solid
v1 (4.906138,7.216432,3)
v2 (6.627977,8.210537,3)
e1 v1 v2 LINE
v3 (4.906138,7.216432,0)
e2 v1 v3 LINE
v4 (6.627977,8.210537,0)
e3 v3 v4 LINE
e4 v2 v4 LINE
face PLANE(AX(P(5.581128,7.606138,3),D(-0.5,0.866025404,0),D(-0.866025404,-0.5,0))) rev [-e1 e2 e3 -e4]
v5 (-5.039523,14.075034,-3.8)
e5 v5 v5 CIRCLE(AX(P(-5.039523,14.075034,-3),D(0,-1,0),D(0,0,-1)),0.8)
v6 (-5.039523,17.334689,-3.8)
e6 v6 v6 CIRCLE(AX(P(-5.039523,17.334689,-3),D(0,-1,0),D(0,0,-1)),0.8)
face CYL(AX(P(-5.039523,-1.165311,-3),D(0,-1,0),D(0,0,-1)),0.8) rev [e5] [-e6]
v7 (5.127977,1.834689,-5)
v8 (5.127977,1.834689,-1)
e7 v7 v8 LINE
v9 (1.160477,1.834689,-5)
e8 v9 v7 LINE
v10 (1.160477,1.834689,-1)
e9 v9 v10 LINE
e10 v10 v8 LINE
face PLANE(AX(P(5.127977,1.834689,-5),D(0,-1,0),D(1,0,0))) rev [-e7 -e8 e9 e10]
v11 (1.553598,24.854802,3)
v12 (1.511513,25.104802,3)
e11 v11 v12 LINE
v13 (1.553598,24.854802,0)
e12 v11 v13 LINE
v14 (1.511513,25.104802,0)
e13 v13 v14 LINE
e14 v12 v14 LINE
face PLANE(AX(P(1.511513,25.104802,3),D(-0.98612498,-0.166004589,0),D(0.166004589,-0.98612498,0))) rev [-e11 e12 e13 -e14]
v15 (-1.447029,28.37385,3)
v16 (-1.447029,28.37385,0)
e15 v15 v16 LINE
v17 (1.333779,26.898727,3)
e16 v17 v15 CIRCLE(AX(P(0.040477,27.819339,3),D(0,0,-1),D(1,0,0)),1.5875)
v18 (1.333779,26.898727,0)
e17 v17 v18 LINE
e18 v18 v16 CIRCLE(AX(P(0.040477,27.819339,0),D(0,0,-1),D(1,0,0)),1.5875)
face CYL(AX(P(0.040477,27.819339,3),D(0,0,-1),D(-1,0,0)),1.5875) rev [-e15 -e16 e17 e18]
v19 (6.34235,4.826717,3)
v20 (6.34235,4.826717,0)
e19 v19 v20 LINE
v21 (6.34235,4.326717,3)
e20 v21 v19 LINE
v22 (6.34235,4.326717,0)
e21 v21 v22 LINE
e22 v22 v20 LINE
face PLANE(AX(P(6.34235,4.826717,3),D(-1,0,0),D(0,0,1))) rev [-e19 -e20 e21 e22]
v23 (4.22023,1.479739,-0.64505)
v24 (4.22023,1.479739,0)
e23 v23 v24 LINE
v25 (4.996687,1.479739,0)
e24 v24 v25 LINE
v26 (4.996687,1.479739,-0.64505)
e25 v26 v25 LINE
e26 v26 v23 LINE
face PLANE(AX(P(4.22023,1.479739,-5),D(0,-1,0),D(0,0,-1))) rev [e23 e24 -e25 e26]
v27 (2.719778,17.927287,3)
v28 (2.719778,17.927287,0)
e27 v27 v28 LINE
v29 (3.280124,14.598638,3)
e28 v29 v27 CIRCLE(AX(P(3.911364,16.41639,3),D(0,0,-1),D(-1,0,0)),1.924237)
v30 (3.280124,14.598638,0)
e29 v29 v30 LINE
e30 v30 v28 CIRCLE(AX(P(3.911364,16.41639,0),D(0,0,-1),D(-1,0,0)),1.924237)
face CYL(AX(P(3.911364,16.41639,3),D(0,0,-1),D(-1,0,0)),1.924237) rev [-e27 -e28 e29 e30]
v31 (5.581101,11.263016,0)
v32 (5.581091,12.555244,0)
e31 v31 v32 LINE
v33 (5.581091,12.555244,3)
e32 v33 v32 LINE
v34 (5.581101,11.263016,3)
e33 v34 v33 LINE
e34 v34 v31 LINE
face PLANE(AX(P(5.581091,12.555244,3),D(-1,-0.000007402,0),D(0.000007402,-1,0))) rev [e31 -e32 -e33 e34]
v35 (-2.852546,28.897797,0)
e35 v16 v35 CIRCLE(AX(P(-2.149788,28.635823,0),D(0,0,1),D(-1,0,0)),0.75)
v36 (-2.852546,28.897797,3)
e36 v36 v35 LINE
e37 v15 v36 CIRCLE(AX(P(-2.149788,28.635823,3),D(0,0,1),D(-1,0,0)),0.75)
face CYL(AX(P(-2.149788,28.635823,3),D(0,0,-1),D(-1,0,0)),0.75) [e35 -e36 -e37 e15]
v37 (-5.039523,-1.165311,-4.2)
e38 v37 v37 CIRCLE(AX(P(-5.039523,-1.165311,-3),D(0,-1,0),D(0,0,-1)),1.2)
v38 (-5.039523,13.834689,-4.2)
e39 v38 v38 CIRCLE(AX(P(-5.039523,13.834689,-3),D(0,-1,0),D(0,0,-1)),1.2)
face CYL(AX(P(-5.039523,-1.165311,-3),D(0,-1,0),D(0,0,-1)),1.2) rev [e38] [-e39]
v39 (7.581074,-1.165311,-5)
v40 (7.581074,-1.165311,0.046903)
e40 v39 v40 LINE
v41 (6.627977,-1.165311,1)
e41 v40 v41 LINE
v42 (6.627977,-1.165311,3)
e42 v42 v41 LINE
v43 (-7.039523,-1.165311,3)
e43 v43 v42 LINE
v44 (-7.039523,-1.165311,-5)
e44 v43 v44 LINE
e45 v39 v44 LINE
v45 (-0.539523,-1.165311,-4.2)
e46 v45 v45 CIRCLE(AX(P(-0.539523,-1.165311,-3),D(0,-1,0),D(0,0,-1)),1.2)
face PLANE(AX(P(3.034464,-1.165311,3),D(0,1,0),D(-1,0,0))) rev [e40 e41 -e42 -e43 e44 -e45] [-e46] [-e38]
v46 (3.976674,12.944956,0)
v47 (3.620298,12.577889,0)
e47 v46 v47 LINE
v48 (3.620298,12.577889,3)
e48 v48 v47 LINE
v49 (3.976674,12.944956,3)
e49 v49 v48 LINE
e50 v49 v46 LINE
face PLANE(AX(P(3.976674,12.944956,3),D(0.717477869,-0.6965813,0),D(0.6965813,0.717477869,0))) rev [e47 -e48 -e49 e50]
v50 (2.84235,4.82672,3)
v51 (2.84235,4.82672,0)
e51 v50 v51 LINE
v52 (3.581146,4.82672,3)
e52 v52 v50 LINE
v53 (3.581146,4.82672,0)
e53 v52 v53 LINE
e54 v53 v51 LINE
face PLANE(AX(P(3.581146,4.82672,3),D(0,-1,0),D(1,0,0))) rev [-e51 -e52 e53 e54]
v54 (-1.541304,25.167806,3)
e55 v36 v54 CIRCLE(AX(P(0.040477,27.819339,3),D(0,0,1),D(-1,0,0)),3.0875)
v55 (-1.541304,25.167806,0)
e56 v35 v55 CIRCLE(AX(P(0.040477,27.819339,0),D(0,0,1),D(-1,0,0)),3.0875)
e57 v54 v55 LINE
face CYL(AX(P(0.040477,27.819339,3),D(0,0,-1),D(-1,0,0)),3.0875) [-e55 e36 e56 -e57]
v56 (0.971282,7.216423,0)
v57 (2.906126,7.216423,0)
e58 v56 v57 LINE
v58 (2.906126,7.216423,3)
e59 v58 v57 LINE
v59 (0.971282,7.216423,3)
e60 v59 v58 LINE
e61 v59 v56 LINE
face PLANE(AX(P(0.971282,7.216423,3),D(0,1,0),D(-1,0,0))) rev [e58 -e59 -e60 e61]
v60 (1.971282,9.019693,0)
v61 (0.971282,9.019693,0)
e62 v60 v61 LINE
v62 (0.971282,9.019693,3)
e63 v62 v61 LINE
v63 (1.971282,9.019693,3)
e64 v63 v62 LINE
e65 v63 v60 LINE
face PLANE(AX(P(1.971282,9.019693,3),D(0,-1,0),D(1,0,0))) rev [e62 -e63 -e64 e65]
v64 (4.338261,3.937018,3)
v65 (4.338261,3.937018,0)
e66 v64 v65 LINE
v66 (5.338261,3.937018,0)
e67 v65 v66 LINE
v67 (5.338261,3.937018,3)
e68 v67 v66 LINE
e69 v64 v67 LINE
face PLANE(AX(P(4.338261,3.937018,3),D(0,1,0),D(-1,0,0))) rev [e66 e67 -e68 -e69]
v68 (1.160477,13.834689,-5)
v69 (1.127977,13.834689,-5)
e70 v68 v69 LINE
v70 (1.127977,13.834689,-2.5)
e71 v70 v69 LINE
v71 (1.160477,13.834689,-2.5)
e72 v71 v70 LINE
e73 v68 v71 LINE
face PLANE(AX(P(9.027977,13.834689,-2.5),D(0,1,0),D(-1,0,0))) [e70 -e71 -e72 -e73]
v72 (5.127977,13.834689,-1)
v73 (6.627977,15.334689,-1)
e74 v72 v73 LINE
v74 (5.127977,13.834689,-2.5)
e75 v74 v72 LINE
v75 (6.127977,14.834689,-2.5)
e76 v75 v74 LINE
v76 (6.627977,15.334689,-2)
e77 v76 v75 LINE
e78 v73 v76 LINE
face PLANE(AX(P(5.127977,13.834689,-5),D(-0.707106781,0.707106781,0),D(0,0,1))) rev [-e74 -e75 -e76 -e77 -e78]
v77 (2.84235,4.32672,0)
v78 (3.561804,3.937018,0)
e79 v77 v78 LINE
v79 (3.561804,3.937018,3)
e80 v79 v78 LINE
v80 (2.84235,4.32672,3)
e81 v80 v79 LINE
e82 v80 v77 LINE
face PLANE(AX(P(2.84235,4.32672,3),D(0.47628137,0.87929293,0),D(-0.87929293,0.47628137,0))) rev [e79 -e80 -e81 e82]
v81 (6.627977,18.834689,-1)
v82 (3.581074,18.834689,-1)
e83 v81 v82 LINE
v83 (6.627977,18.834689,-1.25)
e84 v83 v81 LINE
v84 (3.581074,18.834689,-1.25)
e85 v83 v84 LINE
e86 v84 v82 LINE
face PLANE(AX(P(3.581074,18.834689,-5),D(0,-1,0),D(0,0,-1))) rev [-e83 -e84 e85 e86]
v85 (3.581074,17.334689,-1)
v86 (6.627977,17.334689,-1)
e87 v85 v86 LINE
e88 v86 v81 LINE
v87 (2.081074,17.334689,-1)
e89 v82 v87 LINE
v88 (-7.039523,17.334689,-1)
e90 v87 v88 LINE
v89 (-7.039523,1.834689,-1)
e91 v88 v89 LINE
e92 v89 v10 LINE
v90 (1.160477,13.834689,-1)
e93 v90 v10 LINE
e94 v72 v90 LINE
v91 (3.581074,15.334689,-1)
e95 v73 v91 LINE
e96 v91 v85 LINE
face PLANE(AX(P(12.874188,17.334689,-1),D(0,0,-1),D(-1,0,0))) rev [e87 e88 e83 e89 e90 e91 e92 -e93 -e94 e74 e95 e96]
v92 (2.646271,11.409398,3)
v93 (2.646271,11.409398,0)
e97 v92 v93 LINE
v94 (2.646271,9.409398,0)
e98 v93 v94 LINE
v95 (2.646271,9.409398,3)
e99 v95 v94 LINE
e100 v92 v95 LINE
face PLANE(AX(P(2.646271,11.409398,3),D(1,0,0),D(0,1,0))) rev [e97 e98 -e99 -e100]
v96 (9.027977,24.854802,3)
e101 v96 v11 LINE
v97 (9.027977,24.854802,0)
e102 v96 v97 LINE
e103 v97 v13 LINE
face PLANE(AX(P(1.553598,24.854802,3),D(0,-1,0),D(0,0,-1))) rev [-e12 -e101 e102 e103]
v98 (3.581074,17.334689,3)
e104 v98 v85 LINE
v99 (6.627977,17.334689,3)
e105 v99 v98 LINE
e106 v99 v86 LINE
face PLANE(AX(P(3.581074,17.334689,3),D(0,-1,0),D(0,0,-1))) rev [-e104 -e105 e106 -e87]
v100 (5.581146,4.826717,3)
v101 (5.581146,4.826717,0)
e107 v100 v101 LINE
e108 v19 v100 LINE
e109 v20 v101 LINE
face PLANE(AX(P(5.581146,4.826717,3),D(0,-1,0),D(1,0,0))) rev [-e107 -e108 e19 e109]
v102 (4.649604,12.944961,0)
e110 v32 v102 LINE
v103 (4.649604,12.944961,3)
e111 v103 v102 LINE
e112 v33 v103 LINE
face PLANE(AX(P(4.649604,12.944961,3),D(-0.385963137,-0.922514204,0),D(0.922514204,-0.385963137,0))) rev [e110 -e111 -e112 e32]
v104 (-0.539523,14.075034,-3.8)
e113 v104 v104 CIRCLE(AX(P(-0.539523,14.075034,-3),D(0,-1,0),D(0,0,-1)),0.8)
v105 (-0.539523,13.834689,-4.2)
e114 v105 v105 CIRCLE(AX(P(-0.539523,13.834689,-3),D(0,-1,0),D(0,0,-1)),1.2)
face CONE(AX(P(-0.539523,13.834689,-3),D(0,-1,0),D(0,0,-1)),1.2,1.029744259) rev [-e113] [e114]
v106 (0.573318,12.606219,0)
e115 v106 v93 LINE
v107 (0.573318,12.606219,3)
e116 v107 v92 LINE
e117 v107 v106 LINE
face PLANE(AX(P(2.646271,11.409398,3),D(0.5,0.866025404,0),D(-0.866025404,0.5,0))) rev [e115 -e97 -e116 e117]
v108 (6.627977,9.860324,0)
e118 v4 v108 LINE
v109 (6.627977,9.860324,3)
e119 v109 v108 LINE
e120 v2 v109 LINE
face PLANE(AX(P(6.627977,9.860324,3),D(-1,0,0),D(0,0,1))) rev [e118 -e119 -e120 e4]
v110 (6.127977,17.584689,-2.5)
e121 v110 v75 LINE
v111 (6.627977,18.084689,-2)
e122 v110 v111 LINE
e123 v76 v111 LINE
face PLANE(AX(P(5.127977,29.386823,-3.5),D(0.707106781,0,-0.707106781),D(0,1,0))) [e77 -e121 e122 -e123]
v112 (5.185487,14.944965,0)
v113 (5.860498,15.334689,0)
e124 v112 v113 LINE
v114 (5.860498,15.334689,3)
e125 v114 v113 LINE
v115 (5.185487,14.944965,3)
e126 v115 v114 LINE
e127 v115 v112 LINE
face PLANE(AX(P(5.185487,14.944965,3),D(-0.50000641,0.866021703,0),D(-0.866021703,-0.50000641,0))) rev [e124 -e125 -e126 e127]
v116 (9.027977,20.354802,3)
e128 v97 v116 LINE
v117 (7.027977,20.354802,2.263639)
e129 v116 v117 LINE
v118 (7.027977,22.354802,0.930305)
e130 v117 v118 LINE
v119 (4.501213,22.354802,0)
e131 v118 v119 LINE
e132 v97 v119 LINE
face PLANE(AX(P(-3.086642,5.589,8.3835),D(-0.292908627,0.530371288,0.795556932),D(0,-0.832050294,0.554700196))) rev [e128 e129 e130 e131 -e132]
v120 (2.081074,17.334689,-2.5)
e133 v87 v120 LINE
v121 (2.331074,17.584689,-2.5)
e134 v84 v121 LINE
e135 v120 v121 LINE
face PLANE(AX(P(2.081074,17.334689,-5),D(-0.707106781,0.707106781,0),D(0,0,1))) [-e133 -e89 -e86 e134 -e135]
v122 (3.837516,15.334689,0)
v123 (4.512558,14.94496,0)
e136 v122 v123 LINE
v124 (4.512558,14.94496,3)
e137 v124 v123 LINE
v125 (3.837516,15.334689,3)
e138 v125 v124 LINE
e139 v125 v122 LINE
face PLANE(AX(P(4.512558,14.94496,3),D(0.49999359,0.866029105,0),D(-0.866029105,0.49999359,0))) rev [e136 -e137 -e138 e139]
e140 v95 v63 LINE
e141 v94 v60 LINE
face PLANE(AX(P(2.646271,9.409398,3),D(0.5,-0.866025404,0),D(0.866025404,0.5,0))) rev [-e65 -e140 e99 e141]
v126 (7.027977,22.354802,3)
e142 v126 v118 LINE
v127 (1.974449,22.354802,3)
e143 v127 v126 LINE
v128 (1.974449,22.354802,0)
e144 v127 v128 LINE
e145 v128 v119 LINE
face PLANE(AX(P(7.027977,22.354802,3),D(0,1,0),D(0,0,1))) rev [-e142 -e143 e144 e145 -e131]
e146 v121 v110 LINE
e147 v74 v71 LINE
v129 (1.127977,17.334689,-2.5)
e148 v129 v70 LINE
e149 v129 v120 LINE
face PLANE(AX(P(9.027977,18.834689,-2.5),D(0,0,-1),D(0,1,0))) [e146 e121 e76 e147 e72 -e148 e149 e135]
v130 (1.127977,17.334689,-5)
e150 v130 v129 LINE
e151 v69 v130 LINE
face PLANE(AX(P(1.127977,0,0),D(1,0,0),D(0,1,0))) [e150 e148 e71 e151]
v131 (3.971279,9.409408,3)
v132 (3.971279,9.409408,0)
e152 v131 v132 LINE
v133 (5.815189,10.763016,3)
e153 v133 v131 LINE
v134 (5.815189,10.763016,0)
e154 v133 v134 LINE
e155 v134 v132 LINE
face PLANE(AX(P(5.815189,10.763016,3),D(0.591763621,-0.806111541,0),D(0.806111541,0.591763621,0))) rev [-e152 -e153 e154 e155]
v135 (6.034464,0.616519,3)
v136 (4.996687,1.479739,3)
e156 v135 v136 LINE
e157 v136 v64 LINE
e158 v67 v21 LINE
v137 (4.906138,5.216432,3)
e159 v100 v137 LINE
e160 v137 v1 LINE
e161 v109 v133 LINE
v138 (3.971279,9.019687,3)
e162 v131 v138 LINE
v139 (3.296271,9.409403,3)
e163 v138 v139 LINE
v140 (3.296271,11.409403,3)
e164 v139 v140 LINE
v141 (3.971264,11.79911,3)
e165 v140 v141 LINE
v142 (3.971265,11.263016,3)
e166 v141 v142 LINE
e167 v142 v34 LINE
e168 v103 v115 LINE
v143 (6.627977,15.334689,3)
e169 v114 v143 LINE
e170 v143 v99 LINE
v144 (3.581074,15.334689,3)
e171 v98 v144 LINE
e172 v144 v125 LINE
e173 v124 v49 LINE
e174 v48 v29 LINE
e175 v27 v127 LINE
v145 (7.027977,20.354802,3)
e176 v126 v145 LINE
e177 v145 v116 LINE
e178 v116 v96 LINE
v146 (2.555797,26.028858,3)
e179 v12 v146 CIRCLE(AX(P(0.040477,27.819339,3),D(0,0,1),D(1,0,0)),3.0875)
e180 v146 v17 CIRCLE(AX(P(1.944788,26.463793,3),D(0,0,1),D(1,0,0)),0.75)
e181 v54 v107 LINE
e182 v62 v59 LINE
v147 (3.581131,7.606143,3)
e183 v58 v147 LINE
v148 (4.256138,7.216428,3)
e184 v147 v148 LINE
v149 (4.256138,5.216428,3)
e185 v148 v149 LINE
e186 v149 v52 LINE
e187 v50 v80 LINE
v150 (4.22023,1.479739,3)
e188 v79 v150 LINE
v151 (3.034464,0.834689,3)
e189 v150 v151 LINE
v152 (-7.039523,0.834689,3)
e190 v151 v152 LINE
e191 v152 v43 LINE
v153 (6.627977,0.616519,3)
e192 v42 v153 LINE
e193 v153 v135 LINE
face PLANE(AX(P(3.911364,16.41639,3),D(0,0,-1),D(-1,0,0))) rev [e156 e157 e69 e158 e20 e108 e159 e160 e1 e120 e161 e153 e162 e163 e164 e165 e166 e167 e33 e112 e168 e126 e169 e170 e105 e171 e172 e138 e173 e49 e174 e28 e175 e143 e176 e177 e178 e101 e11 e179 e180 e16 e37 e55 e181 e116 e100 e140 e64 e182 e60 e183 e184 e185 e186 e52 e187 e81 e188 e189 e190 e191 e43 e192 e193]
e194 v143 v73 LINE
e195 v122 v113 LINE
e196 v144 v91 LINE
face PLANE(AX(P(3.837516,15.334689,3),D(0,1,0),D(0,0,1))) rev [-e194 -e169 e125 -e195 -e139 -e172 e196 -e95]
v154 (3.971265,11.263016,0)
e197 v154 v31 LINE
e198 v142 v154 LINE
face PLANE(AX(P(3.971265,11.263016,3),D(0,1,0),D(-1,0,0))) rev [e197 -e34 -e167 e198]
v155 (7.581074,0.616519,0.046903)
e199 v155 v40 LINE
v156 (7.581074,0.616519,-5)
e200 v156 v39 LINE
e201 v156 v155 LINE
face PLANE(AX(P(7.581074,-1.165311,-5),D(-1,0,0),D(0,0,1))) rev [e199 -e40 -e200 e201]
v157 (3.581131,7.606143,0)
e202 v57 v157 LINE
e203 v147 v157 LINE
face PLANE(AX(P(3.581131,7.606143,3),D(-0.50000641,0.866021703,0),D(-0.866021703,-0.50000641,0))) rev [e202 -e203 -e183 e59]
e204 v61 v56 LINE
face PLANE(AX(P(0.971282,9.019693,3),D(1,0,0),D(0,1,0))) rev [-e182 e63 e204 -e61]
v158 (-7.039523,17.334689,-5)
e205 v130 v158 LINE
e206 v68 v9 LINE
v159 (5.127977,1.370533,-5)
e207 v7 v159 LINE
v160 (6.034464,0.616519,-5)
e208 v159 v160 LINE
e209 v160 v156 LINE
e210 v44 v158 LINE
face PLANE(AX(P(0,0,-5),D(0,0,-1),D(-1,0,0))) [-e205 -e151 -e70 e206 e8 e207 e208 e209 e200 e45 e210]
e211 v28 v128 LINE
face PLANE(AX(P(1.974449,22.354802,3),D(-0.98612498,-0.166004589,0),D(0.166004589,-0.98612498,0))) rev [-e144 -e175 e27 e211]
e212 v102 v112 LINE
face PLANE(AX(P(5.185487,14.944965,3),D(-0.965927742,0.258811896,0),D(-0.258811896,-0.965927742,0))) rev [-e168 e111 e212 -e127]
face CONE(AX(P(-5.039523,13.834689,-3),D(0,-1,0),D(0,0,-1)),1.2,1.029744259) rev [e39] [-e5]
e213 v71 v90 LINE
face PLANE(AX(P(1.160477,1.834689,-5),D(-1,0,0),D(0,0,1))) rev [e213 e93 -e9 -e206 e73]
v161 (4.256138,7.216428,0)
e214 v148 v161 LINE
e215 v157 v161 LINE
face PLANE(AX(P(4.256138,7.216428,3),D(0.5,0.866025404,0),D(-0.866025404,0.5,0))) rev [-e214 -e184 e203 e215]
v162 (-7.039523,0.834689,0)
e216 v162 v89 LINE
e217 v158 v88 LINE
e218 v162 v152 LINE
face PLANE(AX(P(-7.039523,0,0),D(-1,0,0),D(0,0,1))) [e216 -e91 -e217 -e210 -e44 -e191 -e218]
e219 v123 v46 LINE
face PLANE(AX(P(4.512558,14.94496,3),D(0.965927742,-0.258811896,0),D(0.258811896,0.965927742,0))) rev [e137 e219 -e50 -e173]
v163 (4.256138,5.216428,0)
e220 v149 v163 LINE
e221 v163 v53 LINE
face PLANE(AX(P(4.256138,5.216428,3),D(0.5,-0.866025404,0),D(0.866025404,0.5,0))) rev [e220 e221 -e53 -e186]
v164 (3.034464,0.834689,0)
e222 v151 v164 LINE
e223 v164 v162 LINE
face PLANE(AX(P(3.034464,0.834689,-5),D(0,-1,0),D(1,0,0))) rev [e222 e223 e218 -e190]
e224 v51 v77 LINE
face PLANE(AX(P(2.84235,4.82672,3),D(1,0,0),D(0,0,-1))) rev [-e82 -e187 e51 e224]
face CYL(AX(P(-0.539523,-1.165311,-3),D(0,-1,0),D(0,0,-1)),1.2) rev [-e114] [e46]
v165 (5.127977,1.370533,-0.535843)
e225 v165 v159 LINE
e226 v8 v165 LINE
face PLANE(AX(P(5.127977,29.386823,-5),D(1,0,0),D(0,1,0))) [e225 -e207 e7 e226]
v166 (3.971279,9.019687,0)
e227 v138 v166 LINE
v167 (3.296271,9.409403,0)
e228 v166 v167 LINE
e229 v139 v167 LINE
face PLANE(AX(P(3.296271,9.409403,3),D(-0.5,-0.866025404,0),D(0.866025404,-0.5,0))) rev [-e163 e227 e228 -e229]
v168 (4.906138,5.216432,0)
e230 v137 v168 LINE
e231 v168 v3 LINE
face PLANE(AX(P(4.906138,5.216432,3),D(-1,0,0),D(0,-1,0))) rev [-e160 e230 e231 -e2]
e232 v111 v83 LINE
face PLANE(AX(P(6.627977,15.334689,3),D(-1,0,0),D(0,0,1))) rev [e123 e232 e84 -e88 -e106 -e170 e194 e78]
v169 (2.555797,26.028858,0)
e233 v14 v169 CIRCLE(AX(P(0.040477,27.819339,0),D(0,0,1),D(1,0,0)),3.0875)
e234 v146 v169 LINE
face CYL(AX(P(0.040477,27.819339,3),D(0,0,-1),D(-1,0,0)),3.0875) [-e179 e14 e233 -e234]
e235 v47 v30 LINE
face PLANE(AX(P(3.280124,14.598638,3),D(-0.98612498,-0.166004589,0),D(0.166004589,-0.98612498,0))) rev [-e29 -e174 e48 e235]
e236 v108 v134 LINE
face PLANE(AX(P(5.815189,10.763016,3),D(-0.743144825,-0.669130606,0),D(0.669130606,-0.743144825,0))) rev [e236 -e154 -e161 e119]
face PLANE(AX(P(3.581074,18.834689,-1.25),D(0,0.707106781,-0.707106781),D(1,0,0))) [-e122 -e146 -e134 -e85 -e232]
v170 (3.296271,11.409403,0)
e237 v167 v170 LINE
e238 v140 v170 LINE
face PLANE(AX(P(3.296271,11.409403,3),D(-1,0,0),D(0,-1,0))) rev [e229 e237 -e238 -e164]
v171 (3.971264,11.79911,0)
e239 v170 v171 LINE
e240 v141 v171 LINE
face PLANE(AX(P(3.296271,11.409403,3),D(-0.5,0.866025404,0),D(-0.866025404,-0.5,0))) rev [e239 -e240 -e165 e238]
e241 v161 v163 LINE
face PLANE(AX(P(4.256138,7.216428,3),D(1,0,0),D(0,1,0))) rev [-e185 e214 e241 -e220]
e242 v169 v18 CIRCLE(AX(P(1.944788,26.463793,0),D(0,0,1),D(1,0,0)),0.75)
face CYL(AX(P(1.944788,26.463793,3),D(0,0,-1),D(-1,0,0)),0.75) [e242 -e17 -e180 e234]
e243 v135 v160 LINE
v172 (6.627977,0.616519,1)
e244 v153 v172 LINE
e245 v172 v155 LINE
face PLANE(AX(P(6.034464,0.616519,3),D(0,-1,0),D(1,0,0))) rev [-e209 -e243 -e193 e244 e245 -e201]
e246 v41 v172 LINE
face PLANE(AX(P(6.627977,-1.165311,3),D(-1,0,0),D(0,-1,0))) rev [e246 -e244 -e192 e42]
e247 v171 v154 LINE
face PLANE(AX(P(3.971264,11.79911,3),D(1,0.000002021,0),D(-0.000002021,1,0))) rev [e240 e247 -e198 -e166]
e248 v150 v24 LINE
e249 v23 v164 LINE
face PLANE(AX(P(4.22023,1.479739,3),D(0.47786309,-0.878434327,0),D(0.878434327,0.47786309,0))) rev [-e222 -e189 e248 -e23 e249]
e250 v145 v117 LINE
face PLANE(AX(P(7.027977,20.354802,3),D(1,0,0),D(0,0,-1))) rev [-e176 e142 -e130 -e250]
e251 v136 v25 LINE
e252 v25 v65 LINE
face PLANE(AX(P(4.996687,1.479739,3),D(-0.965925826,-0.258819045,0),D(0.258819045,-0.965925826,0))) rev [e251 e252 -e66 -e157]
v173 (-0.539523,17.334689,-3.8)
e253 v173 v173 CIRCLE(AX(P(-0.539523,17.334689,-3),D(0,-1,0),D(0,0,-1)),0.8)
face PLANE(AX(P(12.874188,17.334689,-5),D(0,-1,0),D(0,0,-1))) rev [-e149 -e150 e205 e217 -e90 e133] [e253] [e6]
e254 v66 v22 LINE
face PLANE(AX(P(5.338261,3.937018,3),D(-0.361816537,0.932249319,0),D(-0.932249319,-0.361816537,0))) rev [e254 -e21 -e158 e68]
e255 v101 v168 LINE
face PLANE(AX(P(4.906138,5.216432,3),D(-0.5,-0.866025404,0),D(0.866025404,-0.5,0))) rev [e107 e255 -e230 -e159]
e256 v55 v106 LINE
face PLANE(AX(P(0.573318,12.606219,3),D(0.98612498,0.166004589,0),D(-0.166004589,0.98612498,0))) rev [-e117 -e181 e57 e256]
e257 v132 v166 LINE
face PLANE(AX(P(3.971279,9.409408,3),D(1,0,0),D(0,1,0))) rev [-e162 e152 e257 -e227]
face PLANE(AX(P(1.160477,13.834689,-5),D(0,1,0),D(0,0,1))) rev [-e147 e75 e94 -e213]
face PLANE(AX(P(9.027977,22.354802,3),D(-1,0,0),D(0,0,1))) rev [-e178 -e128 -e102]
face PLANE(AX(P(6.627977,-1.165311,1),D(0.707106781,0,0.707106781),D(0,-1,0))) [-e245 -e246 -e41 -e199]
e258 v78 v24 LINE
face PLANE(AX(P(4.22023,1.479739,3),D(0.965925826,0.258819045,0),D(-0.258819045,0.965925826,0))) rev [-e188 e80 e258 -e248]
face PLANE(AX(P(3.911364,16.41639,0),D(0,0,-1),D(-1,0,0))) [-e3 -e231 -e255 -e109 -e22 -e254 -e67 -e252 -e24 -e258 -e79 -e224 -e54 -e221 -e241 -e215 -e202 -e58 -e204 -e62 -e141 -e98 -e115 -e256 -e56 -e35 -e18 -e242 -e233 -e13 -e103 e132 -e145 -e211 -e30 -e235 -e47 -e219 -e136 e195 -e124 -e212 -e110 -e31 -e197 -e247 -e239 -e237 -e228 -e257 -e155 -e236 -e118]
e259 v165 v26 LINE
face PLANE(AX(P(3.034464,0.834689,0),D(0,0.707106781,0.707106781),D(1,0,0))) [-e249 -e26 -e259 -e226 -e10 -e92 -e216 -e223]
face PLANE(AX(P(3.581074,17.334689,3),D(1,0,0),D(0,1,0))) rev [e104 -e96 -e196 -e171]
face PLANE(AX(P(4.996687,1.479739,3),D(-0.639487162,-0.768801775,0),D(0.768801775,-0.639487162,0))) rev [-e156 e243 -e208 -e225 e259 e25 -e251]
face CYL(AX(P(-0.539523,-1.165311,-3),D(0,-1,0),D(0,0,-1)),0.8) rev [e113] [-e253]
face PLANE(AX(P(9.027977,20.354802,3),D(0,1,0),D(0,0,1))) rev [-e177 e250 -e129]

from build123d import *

# Parameters (mm, degrees)
BOSS_SWITCH_BODY_DEPTH                    = 3
SKETCH1_W                                 = 4
SKETCH1_H                                 = 3.5
BOSS_FLANGE_WIDTH_DEPTH                   = 5
BOSS_FLANGE_HEIGHT_REACH                  = 35.863
SKETCH2_W                                 = 4
SKETCH2_H                                 = 2
SKETCH2_W_2                               = 8
CUT_UP_TO_DOWN_DERAILLEUR_CLEARANCE_REACH = 21.462
SKETCH10_W                                = 2.453096586
SKETCH10_H                                = 3
SKETCH17_W                                = 12.1675
SKETCH17_H                                = 4
BOSS_FLANGE_SUPPORT_DEPTH                 = 14.499999955
TAP_DRILL_FOR_M2X0_4_TAP1_D               = 1.6
M2_CLEARANCE_HOLE2_D                      = 2.4
M2_CLEARANCE_HOLE2_DEPTH                  = 15
M2_CLEARANCE_HOLE2_TIP                    = 0.721032743
CHAMFER_FLANGE_SUPPORT_SIZE               = 1.5
CHAMFER_FLANGE_SUPPORT_2_SIZE             = 1.5
CHAMFER_FLANGE_SUPPORT_3_SIZE             = 1
SKETCH23_W                                = 3.9675
SKETCH23_H                                = 11.999999954
CUT_GAP_FOR_PRINTING_DEPTH                = 32.000499688
SKETCH25_W                                = 0.953096586
SKETCH25_H                                = 3.5
CUT_DERAILLEUR_CLEARANCE_DEPTH            = 32.145320369
CHAMFER8_SIZE                             = 1
CUT_UP_TO_DOWN_CANTILEVER_SLOPE_REACH     = 31.869
SKETCH26_W                                = 12.477246204
SKETCH26_H                                = 5.771077126
CUT_WIDE_DERAILLEUR_CLEARANCE_DEPTH       = 33.195879702
CUT_WIDE_DERAILLEUR_CLEARANCE_DEPTH_BACK  = 4
SKETCH27_W                                = 2.5
SKETCH27_H                                = 5.000000046
CHAMFER9_SIZE                             = 1.25
SKETCH28_W                                = 3.046903414
SKETCH28_H                                = 1.5
CUT_EXTRUDE1_DEPTH                        = 1


# Some blends are built 0.0001 mm under size
with BuildPart() as part:
    # Sketch-SwitchBossUp → Boss-Switch Body (new body)
    with BuildSketch(Plane.XY):
        with BuildLine():
            Line((5.581091201, 12.55524379), (5.581100766, 11.263016279))
            Line((5.581100766, 11.263016279), (3.971265023, 11.263016279))
            Line((3.971265023, 11.263016279), (3.97126394, 11.79911022))
            Line((3.97126394, 11.79911022), (3.296271341, 11.409403061))
            Line((3.296271341, 11.409403061), (3.296271341, 9.409403061))
            Line((3.296271341, 9.409403061), (3.971278743, 9.019687356))
            Line((3.971278743, 9.019687356), (3.971278743, 9.409408058))
            Line((3.971278743, 9.409408058), (5.815189336, 10.763016279))
            Line((5.815189336, 10.763016279), (6.627976927, 9.860324207))
            Line((6.627976927, 9.860324207), (6.627976927, 8.210536506))
            Line((6.627976927, 8.210536506), (5.581127833, 7.606137899))
            Line((5.581127833, 7.606137899), (4.906138119, 7.216432406))
            Line((4.906138119, 7.216432406), (4.906138119, 5.216432406))
            Line((4.906138119, 5.216432406), (5.58114552, 4.826716701))
            Line((5.58114552, 4.826716701), (6.342350466, 4.826716701))
            Line((6.342350466, 4.826716701), (6.342350466, 4.326716701))
            Line((6.342350466, 4.326716701), (5.338261222, 3.937018274))
            Line((5.338261222, 3.937018274), (4.338261222, 3.937018274))
            Line((4.338261222, 3.937018274), (4.996687221, 1.479738993))
            Line((4.996687221, 1.479738993), (6.034464198, 0.616519013))
            Line((6.034464198, 0.616519013), (6.627976927, 0.616519013))
            Line((6.627976927, 0.616519013), (6.627976927, -1.165310653))
            Line((6.627976927, -1.165310653), (3.034464198, -1.165310653))
            Line((3.034464198, -1.165310653), (3.034464198, 0.834689347))
            Line((3.034464198, 0.834689347), (4.220230086, 1.479738993))
            Line((4.220230086, 1.479738993), (3.561804087, 3.937018274))
            Line((3.561804087, 3.937018274), (2.842350466, 4.326720436))
            Line((2.842350466, 4.326720436), (2.842350466, 4.826720436))
            Line((2.842350466, 4.826720436), (3.58114552, 4.826720436))
            Line((3.58114552, 4.826720436), (4.256138119, 5.216427595))
            Line((4.256138119, 5.216427595), (4.256138119, 7.216427595))
            Line((4.256138119, 7.216427595), (3.581130717, 7.6061433))
            Line((3.581130717, 7.6061433), (2.9061262, 7.216422599))
            Line((2.9061262, 7.216422599), (0.971281627, 7.216422599))
            Line((0.971281627, 7.216422599), (0.971281627, 9.019692757))
            Line((0.971281627, 9.019692757), (1.971281627, 9.019692757))
            Line((1.971281627, 9.019692757), (2.646271341, 9.40939825))
            Line((2.646271341, 9.40939825), (2.646271341, 11.40939825))
            Line((2.646271341, 11.40939825), (1.696557212, 11.957715958))
            Line((1.696557212, 11.957715958), (0.573317845, 12.60621851))
            Line((0.573317845, 12.60621851), (-1.541303694, 25.167805745))
            ThreePointArc((-1.541303694, 25.167805745), (-2.872284003, 26.795385437), (-2.852546321, 28.897797067))
            ThreePointArc((-2.852546321, 28.897797067), (-1.887813913, 29.338582026), (-1.447028953, 28.373849618))
            ThreePointArc((-1.447028953, 28.373849618), (-0.703448682, 26.416936722), (1.333779254, 26.898727173))
            ThreePointArc((1.333779254, 26.898727173), (2.379722745, 27.074801628), (2.555797201, 26.028858137))
            ThreePointArc((2.555797201, 26.028858137), (2.086504637, 25.507104397), (1.511513111, 25.104801997))
            Line((1.511513111, 25.104801997), (1.553598189, 24.854801997))
            Line((1.553598189, 24.854801997), (9.027976927, 24.854801997))
            Line((9.027976927, 24.854801997), (9.027976927, 22.354801997))
            Line((9.027976927, 22.354801997), (9.027976927, 20.354801997))
            Line((9.027976927, 20.354801997), (7.027976927, 20.354801997))
            Line((7.027976927, 20.354801997), (7.027976927, 22.354801997))
            Line((7.027976927, 22.354801997), (1.974448974, 22.354801997))
            Line((1.974448974, 22.354801997), (2.719778232, 17.927287042))
            ThreePointArc((2.719778232, 17.927287042), (2.013826204, 16.096957693), (3.280124137, 14.598637521))
            Line((3.280124137, 14.598637521), (3.620297651, 12.577888564))
            Line((3.620297651, 12.577888564), (3.976674365, 12.944956135))
            Line((3.976674365, 12.944956135), (4.512557947, 14.944960101))
            Line((4.512557947, 14.944960101), (3.837515632, 15.334689301))
            Line((3.837515632, 15.334689301), (3.581073513, 15.334689301))
            Line((3.581073513, 15.334689301), (3.581073513, 17.334689301))
            Line((3.581073513, 17.334689301), (5.725580434, 17.334689301))
            Line((5.725580434, 17.334689301), (6.627976927, 17.334689301))
            Line((6.627976927, 17.334689301), (6.627976927, 15.334689301))
            Line((6.627976927, 15.334689301), (5.860498075, 15.334689301))
            Line((5.860498075, 15.334689301), (5.185487464, 14.944965082))
            Line((5.185487464, 14.944965082), (4.649603883, 12.944961115))
            Line((4.649603883, 12.944961115), (5.581091201, 12.55524379))
        make_face()
    extrude(amount=BOSS_SWITCH_BODY_DEPTH)

    # Sketch1 → Boss-Flange Width (add)
    with BuildSketch(Plane(origin=(0, 0, 0), x_dir=(-1, 0, 0), z_dir=(0, 0, -1))):
        Polygon((-7.581073513, -1.165310653), (0.412170615, -1.165310653), (0.412170615, 0.834689347), (-3.034464198, 0.834689347), (-4.220230086, 1.479738993), (-4.996687221, 1.479738993), (-6.034464198, 0.616519013), (-7.581073513, 0.616519013), align=None)
        with Locations((-5.581073513, 17.084689301)):
            Rectangle(SKETCH1_W, SKETCH1_H)
    extrude(amount=BOSS_FLANGE_WIDTH_DEPTH)

    # Sketch2 → Boss-Flange Height (add, up to next)
    with BuildSketch(Plane(origin=(-7.039523073, 0, 0), x_dir=(0, 0, -1), z_dir=(1, 0, 0)), mode=Mode.PRIVATE) as boss_flange_height_sk1:
        with Locations((3, 16.334689301)):
            Rectangle(SKETCH2_W, SKETCH2_H)
    boss_flange_height_tool1 = extrude(boss_flange_height_sk1.sketch, amount=BOSS_FLANGE_HEIGHT_REACH, mode=Mode.PRIVATE) - part.part
    # Sketch2 → Boss-Flange Height (add, up to next)
    with BuildSketch(Plane(origin=(-7.039523073, 0, 0), x_dir=(0, 0, -1), z_dir=(1, 0, 0)), mode=Mode.PRIVATE) as boss_flange_height_sk2:
        with Locations((1, -0.165310653)):
            Rectangle(SKETCH2_W_2, SKETCH2_H)
    boss_flange_height_tool2 = extrude(boss_flange_height_sk2.sketch, amount=BOSS_FLANGE_HEIGHT_REACH, mode=Mode.PRIVATE) - part.part
    add(boss_flange_height_tool1.solids().sort_by_distance((-7.039523, 16.334689, -3))[0])
    add(boss_flange_height_tool2.solids().sort_by_distance((-7.039523, -0.165311, -1))[0])

    # Sketch10 → Cut-Up-To-Down Derailleur Clearance (cut, up to next)
    with BuildSketch(Plane(origin=(0, 15.334689301, 0), x_dir=(1, 0, 0), z_dir=(0, 1, 0)), mode=Mode.PRIVATE) as cut_up_to_down_derailleur_clearance_sk1:
        with Locations((6.35452522, 3.5)):
            Rectangle(SKETCH10_W, SKETCH10_H)
    cut_up_to_down_derailleur_clearance_tool1 = extrude(cut_up_to_down_derailleur_clearance_sk1.sketch, amount=CUT_UP_TO_DOWN_DERAILLEUR_CLEARANCE_REACH, mode=Mode.PRIVATE) & part.part
    add(cut_up_to_down_derailleur_clearance_tool1.solids().sort_by_distance((6.354525, 15.334689, -3.5))[0], mode=Mode.SUBTRACT)

    # Sketch17 → Boss-Flange Support (add)
    with BuildSketch(Plane.XZ.offset(-15.334689301)):
        with Locations((-0.955773073, -3)):
            Rectangle(SKETCH17_W, SKETCH17_H)
    extrude(amount=BOSS_FLANGE_SUPPORT_DEPTH)

    # Tap Drill for M2x0.4 Tap1 (through all)
    with Locations(Plane(origin=(0, -1.165310653, 0), x_dir=(-1, 0, 0), z_dir=(0, -1, 0))):
        with Locations((5.039523073, 3), (0.539523073, 3)):
            Hole(TAP_DRILL_FOR_M2X0_4_TAP1_D / 2)

    # M2 Clearance Hole2
    with Locations(Plane.XZ.offset(1.165310653)):
        with Locations((-5.039523073, -3), (-0.539523073, -3)):
            Hole(M2_CLEARANCE_HOLE2_D / 2, depth=M2_CLEARANCE_HOLE2_DEPTH)
            with Locations((0, 0, -(M2_CLEARANCE_HOLE2_DEPTH + M2_CLEARANCE_HOLE2_TIP / 2))):  # 118° drill point
                Cone(0, M2_CLEARANCE_HOLE2_D / 2, M2_CLEARANCE_HOLE2_TIP, mode=Mode.SUBTRACT)

    # Chamfer-Flange Support
    chamfer_flange_support_edges = [part.edges().sort_by_distance(p)[0] for p in [
        (3.581073513, 17.334689301, -3),
    ]]
    chamfer(chamfer_flange_support_edges, length=CHAMFER_FLANGE_SUPPORT_SIZE - 0.0001)  # a hair under: the kernel refuses the full size

    # Chamfer-Flange Support 2
    chamfer_flange_support_2_edges = [part.edges().sort_by_distance(p)[0] for p in [
        (5.127976927, 17.084689301, -2),
        (5.127976927, 15.334689301, -1.5),
    ]]
    chamfer(chamfer_flange_support_2_edges, length=CHAMFER_FLANGE_SUPPORT_2_SIZE)

    # Chamfer-Flange Support 3
    chamfer_flange_support_3_edges = [part.edges().sort_by_distance(p)[0] for p in [
        (-2.002529437, 0.834689346, -1),
    ]]
    chamfer(chamfer_flange_support_3_edges, length=CHAMFER_FLANGE_SUPPORT_3_SIZE)

    # Sketch23 → Cut-Gap for Printing (cut, through all)
    with BuildSketch(Plane.XY.offset(-1)):
        with Locations((3.144226927, 7.834689324)):
            Rectangle(SKETCH23_W, SKETCH23_H)
    extrude(amount=-CUT_GAP_FOR_PRINTING_DEPTH, mode=Mode.SUBTRACT)

    # Sketch25 → Cut-Derailleur Clearance (cut, through all)
    with BuildSketch(Plane.XY):
        with Locations((7.10452522, 17.084689301)):
            Rectangle(SKETCH25_W, SKETCH25_H)
    extrude(amount=-CUT_DERAILLEUR_CLEARANCE_DEPTH, mode=Mode.SUBTRACT)

    # Chamfer8
    # the kernel refuses this chamfer: 1 mm, written as the material it adds along each edge
    with BuildSketch(Plane(origin=(6.627976927, 0.616519013, 0), x_dir=(0.9996219169112968, -2.9896548410572577e-15, -0.027495876610586365), z_dir=(0, -1, 0))) as chamfer8_piece_1_section:
        Polygon((CHAMFER8_SIZE * 0.999621916911, CHAMFER8_SIZE * 0.0274958766106), (-CHAMFER8_SIZE * 0.0274958766106, CHAMFER8_SIZE * 0.999621916911), (0, 0), align=None)
    chamfer8_piece_1 = extrude(amount=1.781829666, mode=Mode.PRIVATE)
    chamfer8_piece_1 = split(chamfer8_piece_1, bisect_by=Plane(origin=(7.581073513, -0.27439582, 0.332375145), z_dir=(-1, 0, 0)), keep=Keep.TOP, mode=Mode.PRIVATE)
    add(chamfer8_piece_1)

    # Sketch26 → Cut-Up-to-Down Cantilever Slope (cut, up to next)
    with BuildSketch(Plane(origin=(-3.086642121, 5.589000146, 8.383500218), x_dir=(-0.9561404375276108, -0.1624764728289173, -0.24371470924337582), z_dir=(0.2929086269205964, -0.5303712883154423, -0.795556932473163)), mode=Mode.PRIVATE) as cut_up_to_down_cantilever_slope_sk1:
        with Locations((-13.791615152, 17.794906754)):
            Rectangle(SKETCH26_W, SKETCH26_H)
    cut_up_to_down_cantilever_slope_tool1 = extrude(cut_up_to_down_cantilever_slope_sk1.sketch, amount=CUT_UP_TO_DOWN_CANTILEVER_SLOPE_REACH, mode=Mode.PRIVATE) & part.part
    add(cut_up_to_down_cantilever_slope_tool1.solids().sort_by_distance((10.100079, 22.636071, 1.873881))[0], mode=Mode.SUBTRACT)

    # Sketch27 → Cut-Wide Derailleur Clearance (cut, two sides: drawn at the far end of the back side and taken through both)
    with BuildSketch(Plane(origin=(5.127976927, 0, 0), x_dir=(0, 0, -1), z_dir=(1, 0, 0)).offset(-CUT_WIDE_DERAILLEUR_CLEARANCE_DEPTH_BACK)):
        with Locations((3.75, 16.334689324)):
            Rectangle(SKETCH27_W, SKETCH27_H)
    extrude(amount=CUT_WIDE_DERAILLEUR_CLEARANCE_DEPTH + CUT_WIDE_DERAILLEUR_CLEARANCE_DEPTH_BACK, mode=Mode.SUBTRACT)

    # Chamfer9
    chamfer9_edges = [part.edges().sort_by_distance(p)[0] for p in [
        (4.85452522, 18.834689347, -2.5),
    ]]
    chamfer(chamfer9_edges, length=CHAMFER9_SIZE)

    # Sketch28 → Cut-Extrude1 (cut)
    with BuildSketch(Plane.XY.offset(-1)):
        with Locations((5.10452522, 18.084689301)):
            Rectangle(SKETCH28_W, SKETCH28_H)
    extrude(amount=CUT_EXTRUDE1_DEPTH, mode=Mode.SUBTRACT)


solid = part.part
